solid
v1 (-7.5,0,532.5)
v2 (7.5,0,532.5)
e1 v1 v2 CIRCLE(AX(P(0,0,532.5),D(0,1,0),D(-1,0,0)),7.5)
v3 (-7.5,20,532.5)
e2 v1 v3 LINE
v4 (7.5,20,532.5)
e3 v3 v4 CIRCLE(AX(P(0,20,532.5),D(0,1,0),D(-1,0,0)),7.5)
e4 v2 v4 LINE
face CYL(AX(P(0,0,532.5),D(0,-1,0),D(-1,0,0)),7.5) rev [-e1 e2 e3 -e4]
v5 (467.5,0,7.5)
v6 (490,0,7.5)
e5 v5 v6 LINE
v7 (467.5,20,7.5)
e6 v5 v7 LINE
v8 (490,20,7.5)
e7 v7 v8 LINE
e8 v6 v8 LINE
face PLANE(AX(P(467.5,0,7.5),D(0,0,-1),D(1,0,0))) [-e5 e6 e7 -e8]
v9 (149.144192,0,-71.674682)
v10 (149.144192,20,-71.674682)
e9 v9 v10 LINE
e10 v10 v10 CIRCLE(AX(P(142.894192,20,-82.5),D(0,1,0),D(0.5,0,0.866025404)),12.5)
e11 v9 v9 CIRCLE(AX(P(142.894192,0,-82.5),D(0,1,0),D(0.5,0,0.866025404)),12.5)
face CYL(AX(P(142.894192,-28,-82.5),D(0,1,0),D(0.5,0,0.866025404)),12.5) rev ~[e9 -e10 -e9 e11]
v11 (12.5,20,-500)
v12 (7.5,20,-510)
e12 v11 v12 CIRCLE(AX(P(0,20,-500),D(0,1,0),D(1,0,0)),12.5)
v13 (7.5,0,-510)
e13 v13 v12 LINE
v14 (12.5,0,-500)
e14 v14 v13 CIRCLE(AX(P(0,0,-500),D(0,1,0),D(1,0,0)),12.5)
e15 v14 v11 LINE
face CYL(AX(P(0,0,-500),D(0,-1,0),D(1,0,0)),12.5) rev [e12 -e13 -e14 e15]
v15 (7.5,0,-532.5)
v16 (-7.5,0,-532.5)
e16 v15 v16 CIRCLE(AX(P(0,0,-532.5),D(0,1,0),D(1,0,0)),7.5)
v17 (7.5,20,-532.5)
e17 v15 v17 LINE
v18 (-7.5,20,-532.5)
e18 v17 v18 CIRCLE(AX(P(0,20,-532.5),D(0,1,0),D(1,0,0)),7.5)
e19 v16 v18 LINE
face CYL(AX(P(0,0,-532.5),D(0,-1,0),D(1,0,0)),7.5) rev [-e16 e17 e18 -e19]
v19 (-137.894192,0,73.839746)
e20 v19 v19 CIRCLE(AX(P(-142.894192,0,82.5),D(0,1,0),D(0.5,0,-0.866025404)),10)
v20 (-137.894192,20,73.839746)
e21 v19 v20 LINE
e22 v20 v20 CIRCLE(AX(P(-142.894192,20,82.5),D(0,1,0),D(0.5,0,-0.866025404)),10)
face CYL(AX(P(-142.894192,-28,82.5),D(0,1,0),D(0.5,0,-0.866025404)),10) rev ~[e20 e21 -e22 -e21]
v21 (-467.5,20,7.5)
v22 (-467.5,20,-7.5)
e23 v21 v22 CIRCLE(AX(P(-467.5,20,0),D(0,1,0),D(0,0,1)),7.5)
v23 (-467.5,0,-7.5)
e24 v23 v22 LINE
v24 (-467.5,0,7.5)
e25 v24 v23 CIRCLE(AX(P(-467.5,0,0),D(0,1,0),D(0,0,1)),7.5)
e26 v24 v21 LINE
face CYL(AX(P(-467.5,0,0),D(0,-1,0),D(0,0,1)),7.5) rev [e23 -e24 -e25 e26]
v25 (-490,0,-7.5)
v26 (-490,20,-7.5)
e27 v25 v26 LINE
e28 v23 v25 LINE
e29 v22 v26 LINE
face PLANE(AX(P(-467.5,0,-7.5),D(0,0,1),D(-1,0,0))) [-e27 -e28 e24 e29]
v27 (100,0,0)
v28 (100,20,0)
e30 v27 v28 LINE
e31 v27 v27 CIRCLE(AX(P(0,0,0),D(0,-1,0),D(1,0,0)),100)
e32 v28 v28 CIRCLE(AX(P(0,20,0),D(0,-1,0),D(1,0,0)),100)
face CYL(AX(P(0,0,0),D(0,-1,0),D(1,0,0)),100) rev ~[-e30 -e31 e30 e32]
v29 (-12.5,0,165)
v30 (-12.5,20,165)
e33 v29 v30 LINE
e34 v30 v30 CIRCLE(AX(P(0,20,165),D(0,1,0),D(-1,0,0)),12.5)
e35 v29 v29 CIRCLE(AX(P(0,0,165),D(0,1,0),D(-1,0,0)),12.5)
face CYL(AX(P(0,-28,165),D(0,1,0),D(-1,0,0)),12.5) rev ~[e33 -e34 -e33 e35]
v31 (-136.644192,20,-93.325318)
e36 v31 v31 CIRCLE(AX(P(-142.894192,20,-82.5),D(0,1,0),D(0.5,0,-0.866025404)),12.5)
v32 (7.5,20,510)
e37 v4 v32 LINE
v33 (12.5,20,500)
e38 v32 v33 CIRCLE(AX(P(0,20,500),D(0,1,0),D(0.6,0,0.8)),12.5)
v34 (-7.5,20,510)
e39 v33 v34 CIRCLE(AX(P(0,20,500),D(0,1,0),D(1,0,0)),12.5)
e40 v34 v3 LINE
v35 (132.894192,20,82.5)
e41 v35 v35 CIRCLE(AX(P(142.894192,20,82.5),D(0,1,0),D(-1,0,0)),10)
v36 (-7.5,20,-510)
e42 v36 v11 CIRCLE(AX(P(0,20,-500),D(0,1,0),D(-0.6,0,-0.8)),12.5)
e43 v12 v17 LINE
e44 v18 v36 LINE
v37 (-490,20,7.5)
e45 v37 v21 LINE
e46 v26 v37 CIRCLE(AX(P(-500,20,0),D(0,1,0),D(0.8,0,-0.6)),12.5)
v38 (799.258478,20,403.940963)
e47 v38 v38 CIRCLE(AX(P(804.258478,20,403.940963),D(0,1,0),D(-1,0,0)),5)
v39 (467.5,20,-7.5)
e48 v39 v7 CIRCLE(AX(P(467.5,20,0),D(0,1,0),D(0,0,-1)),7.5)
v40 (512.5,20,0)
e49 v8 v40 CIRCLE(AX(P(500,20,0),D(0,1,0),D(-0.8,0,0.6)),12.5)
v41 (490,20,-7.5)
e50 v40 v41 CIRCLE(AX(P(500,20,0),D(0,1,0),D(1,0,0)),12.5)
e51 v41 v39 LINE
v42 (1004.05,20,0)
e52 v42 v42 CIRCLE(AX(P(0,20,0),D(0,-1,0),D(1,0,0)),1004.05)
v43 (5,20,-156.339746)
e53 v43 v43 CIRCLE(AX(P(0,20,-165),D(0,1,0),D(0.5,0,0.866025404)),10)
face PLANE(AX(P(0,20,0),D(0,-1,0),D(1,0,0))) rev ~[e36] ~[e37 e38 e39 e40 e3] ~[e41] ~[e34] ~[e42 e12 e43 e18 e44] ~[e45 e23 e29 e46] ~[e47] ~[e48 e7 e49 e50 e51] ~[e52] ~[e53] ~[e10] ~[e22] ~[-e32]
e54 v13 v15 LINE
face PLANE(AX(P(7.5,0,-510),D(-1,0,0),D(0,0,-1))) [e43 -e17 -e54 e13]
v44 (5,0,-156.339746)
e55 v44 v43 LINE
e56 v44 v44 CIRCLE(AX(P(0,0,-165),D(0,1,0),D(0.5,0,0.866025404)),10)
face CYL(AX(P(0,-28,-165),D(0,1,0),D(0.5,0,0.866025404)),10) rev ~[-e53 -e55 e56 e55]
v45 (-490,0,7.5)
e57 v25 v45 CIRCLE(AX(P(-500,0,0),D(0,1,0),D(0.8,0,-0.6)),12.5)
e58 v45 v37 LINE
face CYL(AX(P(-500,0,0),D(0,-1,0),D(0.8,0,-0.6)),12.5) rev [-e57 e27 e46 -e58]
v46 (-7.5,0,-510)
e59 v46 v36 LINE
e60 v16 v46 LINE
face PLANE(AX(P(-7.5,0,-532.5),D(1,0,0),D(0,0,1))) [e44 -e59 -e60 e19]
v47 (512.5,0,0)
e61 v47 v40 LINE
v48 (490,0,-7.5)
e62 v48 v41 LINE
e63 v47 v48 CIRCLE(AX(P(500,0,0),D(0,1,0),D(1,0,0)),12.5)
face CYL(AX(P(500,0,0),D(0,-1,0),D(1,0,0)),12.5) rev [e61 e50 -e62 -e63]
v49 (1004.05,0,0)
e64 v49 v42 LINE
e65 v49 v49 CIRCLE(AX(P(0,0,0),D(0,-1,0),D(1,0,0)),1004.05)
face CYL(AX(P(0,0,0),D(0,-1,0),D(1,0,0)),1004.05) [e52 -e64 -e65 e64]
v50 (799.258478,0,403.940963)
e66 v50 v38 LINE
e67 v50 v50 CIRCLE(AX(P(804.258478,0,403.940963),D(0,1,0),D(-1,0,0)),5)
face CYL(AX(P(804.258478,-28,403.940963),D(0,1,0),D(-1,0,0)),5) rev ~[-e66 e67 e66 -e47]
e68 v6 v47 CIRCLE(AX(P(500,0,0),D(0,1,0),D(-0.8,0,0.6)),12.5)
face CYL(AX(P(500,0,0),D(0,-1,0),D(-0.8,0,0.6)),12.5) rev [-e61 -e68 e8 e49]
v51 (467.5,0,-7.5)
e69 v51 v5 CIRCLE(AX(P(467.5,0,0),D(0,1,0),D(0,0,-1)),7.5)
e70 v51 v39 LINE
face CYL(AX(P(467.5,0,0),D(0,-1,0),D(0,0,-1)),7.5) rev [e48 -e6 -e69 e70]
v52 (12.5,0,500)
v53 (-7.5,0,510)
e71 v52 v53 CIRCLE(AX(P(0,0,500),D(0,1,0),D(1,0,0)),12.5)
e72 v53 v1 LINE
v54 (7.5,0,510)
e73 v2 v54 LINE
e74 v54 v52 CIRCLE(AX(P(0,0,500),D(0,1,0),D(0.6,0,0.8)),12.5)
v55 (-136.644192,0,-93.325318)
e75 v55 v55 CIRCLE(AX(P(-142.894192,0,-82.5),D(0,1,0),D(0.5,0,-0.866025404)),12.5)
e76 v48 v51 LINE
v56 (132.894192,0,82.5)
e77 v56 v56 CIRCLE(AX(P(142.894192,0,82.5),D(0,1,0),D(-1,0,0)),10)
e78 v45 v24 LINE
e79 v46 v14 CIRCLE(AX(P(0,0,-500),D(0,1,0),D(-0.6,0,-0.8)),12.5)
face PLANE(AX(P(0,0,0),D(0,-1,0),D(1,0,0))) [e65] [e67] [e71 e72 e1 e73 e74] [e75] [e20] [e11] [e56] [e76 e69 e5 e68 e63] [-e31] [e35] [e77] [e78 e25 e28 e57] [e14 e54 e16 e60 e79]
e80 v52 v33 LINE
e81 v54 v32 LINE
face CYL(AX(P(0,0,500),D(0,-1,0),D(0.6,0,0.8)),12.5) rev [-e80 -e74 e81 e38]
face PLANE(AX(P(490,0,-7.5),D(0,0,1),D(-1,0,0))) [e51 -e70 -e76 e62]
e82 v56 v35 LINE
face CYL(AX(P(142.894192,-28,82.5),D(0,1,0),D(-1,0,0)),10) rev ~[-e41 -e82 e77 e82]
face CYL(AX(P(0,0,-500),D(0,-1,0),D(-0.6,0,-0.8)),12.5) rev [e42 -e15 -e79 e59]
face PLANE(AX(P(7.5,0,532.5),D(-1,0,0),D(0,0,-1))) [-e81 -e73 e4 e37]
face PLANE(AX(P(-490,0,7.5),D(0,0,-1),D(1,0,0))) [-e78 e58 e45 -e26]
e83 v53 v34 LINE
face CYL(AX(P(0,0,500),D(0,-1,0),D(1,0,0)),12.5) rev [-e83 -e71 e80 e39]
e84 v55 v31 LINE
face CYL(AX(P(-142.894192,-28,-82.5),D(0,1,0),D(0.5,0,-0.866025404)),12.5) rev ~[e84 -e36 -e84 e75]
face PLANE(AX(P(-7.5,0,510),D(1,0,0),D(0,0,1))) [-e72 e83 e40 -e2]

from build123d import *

# Parameters (mm, degrees)
F0_R            = 1004.05
F0_R_2          = 100
F1_DEPTH        = 20
F2_D            = 25
F2_DEPTH        = 28
F2_TIP          = 7.5107577378
F2_COPIES_COUNT = 3
F3_D            = 20
F3_DEPTH        = 28
F3_TIP          = 6.0086061903
F3_COPIES_COUNT = 3
F4_D            = 10
F4_DEPTH        = 28
F4_TIP          = 3.0043030951


# Not quite as in the source:
# - a pattern or mirror of a feature is missing from the dataset's text; its kind, count and spacing are read off the source's solid


with BuildPart() as f1:
    # F0 (on Front) → F1 (new body)
    with BuildSketch(Plane.XZ):
        Circle(F0_R)
        with BuildLine():
            ThreePointArc((12.5, -500), (11.1803398875, -505.5901699437), (7.5, -510))
            Line((7.5, -510), (7.5, -532.5))
            ThreePointArc((7.5, -532.5), (5.3033008589, -537.8033008589), (0, -540))
            ThreePointArc((0, -540), (-5.3033008589, -537.8033008589), (-7.5, -532.5))
            Line((-7.5, -532.5), (-7.5, -510))
            ThreePointArc((-7.5, -510), (-5.5901699437, -488.8196601125), (12.5, -500))
        make_face(mode=Mode.SUBTRACT)
        with BuildLine():
            ThreePointArc((-490, -7.5), (-512.5, 0), (-490, 7.5))
            Line((-490, 7.5), (-467.5, 7.5))
            ThreePointArc((-467.5, 7.5), (-462.1966991411, 5.3033008589), (-460, 0))
            ThreePointArc((-460, 0), (-462.1966991411, -5.3033008589), (-467.5, -7.5))
            Line((-467.5, -7.5), (-490, -7.5))
        make_face(mode=Mode.SUBTRACT)
        Circle(F0_R_2, mode=Mode.SUBTRACT)
        with BuildLine():
            ThreePointArc((512.5, 0), (503.9528470752, -11.8585412256), (490, -7.5))
            Line((490, -7.5), (467.5, -7.5))
            ThreePointArc((467.5, -7.5), (462.1966991411, -5.3033008589), (460, 0))
            ThreePointArc((460, 0), (462.1966991411, 5.3033008589), (467.5, 7.5))
            Line((467.5, 7.5), (490, 7.5))
            ThreePointArc((490, 7.5), (503.9528470752, 11.8585412256), (512.5, 0))
        make_face(mode=Mode.SUBTRACT)
        with BuildLine():
            ThreePointArc((7.5, 510), (11.1803398875, 505.5901699437), (12.5, 500))
            ThreePointArc((12.5, 500), (-5.5901699437, 488.8196601125), (-7.5, 510))
            Line((-7.5, 510), (-7.5, 532.5))
            ThreePointArc((-7.5, 532.5), (-5.3033008589, 537.8033008589), (0, 540))
            ThreePointArc((0, 540), (5.3033008589, 537.8033008589), (7.5, 532.5))
            Line((7.5, 532.5), (7.5, 510))
        make_face(mode=Mode.SUBTRACT)
    extrude(amount=-F1_DEPTH)

    # F2
    with Locations(Plane.XZ):
        with Locations((0, 165)):
            f2 = Hole(F2_D / 2, depth=F2_DEPTH)
            with Locations((0, 0, -(F2_DEPTH + F2_TIP / 2))):  # 118° drill point
                Cone(0, F2_D / 2, F2_TIP, mode=Mode.SUBTRACT)

    # F2_copies: F2 ×3 about axis
    f2_copies_axis = Axis((0, 0, 0), (0, 1, 0))
    for i in range(1, F2_COPIES_COUNT):
        add(f2.rotate(f2_copies_axis, i * 360 / F2_COPIES_COUNT), mode=Mode.SUBTRACT)

    # F3
    with Locations(Plane.XZ):
        with Locations((142.8941916244, 82.5)):
            f3 = Hole(F3_D / 2, depth=F3_DEPTH)
            with Locations((0, 0, -(F3_DEPTH + F3_TIP / 2))):  # 118° drill point
                Cone(0, F3_D / 2, F3_TIP, mode=Mode.SUBTRACT)

    # F3_copies: F3 ×3 about axis
    f3_copies_axis = Axis((0, 0, 0), (0, 1, 0))
    for i in range(1, F3_COPIES_COUNT):
        add(f3.rotate(f3_copies_axis, i * 360 / F3_COPIES_COUNT), mode=Mode.SUBTRACT)

    # F4
    with Locations(Plane.XZ):
        with Locations((804.2584775463, 403.9409626355)):
            Hole(F4_D / 2, depth=F4_DEPTH)
            with Locations((0, 0, -(F4_DEPTH + F4_TIP / 2))):  # 118° drill point
                Cone(0, F4_D / 2, F4_TIP, mode=Mode.SUBTRACT)


solid = f1.part
